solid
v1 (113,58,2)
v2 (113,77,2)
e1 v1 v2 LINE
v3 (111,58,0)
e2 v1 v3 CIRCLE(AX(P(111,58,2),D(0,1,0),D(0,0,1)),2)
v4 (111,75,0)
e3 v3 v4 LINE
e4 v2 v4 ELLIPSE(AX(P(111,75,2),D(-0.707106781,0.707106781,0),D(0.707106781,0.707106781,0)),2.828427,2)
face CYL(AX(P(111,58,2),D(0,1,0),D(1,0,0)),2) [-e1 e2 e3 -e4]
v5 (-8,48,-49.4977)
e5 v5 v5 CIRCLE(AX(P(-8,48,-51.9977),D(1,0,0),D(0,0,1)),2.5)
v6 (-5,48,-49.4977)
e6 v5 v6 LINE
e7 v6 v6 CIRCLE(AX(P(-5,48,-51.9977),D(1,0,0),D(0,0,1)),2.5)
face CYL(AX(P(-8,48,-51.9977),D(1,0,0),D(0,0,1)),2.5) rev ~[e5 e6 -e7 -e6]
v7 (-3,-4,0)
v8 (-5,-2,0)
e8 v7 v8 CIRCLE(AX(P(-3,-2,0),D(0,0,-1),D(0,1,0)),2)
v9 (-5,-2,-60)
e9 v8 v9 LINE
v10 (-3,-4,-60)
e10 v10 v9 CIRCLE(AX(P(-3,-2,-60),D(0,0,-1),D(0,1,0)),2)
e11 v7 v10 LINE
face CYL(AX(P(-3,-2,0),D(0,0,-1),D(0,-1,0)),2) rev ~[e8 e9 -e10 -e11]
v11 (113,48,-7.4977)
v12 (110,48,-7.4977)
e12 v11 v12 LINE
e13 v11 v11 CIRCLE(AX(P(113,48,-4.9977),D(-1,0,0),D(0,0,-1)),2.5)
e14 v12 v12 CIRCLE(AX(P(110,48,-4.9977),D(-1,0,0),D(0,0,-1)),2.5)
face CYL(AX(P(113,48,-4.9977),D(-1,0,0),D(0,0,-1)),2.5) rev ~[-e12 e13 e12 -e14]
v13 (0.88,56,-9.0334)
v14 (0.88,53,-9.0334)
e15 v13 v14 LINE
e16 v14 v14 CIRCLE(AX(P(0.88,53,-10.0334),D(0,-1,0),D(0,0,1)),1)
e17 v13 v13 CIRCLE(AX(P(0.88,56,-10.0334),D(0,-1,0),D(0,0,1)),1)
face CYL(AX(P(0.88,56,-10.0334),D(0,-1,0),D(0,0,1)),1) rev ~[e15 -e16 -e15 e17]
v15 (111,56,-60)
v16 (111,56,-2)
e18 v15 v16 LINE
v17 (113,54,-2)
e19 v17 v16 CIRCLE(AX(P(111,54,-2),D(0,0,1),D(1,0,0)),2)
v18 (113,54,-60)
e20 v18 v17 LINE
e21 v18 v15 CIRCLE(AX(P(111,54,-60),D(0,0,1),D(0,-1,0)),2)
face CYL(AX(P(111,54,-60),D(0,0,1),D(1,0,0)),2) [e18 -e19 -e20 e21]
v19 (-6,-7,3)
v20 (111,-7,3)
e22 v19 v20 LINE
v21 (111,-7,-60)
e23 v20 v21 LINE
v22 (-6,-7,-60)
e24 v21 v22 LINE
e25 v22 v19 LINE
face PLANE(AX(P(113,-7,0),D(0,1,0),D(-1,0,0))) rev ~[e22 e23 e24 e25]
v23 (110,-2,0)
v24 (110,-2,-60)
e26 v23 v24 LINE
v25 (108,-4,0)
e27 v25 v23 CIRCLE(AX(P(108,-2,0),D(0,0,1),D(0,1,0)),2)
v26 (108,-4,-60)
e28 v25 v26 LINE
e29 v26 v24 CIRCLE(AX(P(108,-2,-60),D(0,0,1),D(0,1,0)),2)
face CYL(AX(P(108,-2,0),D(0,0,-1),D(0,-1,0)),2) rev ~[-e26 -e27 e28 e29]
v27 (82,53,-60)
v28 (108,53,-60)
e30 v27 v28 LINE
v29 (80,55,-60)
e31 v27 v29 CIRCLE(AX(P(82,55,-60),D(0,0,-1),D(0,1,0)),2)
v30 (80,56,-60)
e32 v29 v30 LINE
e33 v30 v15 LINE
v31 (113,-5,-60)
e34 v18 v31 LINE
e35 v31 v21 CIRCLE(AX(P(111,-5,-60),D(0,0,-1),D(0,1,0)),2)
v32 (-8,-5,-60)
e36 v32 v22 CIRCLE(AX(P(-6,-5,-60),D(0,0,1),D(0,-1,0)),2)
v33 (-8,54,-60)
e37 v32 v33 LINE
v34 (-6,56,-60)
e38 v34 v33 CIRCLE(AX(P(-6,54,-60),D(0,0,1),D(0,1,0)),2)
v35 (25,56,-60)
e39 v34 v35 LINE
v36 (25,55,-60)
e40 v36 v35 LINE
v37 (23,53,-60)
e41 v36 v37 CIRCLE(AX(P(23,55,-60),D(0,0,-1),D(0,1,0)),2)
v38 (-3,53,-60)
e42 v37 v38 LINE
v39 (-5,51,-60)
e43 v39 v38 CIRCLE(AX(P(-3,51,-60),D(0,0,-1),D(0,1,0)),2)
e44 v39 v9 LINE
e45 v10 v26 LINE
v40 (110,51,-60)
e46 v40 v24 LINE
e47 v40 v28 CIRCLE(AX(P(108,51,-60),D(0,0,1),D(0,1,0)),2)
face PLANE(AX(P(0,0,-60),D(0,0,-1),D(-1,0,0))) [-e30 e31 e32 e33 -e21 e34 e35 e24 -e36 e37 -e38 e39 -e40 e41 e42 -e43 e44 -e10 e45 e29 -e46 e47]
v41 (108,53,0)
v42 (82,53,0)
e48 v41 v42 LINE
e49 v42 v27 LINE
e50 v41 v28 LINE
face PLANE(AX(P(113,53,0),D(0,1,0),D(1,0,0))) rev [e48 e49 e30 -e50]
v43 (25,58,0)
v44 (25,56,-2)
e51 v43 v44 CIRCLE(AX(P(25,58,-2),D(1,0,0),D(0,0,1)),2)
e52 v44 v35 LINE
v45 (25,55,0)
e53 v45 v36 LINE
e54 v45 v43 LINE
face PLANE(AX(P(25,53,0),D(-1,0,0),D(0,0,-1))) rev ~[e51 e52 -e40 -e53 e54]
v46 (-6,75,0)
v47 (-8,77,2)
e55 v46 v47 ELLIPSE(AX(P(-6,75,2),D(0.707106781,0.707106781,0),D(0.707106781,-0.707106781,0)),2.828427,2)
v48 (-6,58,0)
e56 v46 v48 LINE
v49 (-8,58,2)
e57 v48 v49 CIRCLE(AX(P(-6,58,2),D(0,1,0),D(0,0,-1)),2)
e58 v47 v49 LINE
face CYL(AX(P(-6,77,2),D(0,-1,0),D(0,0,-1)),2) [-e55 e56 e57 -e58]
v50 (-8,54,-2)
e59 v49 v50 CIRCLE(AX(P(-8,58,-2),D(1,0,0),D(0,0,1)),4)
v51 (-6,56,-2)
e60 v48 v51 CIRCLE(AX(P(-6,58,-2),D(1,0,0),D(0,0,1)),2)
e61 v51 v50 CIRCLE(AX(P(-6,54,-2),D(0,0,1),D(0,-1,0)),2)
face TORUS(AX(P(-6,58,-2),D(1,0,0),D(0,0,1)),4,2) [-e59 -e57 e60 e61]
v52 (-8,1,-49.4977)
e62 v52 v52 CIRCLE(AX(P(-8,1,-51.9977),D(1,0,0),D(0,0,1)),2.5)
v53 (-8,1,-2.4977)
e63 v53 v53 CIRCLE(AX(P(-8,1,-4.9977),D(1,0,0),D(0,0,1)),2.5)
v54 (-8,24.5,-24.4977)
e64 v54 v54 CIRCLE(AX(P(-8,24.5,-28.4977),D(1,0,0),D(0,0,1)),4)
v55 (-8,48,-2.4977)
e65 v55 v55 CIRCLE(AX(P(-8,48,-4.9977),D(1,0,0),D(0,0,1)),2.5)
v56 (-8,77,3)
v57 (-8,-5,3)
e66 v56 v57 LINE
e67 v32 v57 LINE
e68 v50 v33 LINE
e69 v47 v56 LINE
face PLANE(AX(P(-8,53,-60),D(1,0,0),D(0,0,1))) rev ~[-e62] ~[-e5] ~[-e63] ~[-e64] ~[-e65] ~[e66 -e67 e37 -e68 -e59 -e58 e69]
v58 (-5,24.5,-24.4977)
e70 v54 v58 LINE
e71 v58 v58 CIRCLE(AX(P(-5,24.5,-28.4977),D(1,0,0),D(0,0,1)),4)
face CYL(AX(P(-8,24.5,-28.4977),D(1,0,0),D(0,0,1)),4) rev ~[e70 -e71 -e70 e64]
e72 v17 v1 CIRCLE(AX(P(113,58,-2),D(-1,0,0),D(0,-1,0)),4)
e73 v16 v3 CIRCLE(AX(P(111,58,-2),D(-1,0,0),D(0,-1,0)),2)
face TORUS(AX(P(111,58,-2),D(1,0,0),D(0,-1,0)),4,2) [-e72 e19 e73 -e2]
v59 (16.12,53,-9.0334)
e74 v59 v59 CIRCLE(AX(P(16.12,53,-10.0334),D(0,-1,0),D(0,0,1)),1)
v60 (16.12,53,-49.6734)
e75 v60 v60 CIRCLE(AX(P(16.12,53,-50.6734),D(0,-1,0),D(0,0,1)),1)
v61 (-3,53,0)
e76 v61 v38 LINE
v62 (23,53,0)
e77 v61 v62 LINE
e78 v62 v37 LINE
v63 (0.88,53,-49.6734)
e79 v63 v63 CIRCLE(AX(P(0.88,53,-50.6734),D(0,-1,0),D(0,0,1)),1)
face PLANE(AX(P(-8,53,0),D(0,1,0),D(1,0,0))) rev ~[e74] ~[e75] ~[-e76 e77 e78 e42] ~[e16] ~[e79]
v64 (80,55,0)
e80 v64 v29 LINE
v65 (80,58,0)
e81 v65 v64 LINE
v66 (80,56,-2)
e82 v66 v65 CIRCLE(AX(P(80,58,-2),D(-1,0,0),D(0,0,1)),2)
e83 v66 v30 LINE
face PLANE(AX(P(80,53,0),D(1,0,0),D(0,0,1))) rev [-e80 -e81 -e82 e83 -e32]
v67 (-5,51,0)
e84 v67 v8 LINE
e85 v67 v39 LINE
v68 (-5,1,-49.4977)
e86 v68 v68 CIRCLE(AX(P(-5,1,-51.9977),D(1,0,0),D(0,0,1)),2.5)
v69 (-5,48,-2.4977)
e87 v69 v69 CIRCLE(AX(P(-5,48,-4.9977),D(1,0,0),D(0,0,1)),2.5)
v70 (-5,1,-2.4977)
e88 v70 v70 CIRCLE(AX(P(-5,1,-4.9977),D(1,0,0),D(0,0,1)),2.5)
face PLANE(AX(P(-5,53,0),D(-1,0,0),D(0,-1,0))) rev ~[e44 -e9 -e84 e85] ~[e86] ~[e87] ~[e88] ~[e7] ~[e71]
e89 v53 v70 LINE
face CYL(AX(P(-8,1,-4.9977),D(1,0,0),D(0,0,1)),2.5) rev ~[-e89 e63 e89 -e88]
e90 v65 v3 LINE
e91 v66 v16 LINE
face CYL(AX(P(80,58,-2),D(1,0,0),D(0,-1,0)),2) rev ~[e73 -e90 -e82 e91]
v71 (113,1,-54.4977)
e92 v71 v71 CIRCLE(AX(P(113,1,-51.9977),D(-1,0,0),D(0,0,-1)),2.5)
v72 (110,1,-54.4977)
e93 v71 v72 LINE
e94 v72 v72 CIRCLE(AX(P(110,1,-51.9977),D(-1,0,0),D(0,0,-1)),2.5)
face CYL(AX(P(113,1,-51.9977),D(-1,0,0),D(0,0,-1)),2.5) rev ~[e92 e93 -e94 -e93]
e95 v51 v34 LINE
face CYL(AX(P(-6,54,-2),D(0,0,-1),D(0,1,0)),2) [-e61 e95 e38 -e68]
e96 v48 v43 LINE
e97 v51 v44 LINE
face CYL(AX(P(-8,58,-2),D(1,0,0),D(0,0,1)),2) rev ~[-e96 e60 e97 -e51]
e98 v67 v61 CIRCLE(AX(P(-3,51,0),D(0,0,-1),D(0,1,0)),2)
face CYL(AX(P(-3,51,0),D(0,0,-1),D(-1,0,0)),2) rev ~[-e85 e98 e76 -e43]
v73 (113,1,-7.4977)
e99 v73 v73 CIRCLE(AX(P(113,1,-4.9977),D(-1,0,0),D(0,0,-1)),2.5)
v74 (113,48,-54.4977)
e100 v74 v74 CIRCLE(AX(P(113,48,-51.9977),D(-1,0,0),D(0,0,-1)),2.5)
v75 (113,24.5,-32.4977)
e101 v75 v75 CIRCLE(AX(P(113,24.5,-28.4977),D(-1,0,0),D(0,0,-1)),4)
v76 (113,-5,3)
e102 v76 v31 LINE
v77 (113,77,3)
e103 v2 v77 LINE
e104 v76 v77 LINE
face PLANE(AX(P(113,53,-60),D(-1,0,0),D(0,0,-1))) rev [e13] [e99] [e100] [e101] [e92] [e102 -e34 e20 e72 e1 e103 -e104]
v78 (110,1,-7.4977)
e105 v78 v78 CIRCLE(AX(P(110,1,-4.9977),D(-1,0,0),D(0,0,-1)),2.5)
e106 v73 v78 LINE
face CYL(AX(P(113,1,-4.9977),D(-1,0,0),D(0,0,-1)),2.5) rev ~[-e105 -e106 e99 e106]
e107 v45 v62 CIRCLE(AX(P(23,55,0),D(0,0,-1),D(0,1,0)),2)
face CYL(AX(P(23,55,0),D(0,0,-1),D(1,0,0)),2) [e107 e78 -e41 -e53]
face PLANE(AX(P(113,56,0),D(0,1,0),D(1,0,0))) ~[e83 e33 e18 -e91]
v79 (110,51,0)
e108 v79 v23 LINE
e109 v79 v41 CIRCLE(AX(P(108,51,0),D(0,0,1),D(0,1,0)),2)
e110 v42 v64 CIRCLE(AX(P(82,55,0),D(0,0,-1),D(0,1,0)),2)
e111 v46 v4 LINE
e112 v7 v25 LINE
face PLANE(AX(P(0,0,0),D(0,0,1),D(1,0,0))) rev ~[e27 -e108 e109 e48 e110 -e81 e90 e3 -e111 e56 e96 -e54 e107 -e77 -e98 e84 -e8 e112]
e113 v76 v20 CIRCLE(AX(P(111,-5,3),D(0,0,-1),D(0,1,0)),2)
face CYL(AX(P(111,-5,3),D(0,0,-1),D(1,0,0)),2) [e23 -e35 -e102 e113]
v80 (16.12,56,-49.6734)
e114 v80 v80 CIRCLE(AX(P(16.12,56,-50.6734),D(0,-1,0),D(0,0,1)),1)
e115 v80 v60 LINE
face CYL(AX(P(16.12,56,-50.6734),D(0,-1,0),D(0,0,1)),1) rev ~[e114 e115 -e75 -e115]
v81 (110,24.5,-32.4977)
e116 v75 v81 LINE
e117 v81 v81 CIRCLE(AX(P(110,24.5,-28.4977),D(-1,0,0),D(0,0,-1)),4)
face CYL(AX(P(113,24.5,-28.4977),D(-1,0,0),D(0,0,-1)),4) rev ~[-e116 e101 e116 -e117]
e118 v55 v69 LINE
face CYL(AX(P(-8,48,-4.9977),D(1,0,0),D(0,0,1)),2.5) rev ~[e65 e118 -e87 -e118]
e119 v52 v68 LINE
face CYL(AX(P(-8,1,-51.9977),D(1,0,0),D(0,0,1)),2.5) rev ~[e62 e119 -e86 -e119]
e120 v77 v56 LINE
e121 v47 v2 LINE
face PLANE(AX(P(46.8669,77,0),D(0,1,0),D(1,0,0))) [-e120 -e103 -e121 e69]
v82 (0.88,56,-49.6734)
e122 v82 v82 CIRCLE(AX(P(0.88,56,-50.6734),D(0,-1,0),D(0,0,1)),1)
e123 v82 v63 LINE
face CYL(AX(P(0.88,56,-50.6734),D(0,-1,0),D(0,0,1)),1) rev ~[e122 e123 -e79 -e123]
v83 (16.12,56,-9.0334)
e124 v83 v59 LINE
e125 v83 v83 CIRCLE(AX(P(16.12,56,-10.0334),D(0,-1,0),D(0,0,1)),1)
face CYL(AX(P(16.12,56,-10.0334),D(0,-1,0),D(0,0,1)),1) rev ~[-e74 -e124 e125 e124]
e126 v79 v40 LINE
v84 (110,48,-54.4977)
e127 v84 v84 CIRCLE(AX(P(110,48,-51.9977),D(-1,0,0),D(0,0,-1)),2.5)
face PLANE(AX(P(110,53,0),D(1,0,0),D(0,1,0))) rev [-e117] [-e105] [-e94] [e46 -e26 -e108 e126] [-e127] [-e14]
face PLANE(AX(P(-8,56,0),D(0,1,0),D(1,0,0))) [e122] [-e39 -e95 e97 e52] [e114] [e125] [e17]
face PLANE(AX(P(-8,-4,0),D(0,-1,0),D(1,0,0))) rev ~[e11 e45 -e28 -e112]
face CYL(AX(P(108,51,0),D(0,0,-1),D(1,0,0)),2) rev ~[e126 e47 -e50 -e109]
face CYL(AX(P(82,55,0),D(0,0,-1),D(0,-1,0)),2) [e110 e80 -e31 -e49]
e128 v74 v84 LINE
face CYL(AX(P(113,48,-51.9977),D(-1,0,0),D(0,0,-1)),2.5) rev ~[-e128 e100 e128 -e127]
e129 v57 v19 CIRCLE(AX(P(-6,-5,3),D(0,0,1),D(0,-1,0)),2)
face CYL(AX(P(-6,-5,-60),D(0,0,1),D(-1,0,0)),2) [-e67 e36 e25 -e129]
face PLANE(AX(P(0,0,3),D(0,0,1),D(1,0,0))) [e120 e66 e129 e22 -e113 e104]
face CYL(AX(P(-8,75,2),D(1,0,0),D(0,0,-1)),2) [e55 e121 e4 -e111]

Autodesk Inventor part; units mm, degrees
ref_plane "YZ Plane" through (0, 0, 0) normal (1, 0, 0) x (0, 1, 0)
ref_plane "XZ Plane" through (0, 0, 0) normal (0, 1, 0) x (-1, 0, 0)
ref_plane "XY Plane" through (0, 0, 0) normal (0, 0, 1) x (1, 0, 0)
sketch "Boceto1" plane through (0, 0, 0) normal (0, 0, 1) x (1, 0, 0)
  line L0 (105, 0) -> (105, 24.5) projected
  line L1 (0, 24.5) -> (0, 0) projected
  line L2 (105, 24.5) -> (0, 24.5)
  line L3 (113, 129.5) -> (-8, 129.5)
  line L4 (-8, 129.5) -> (-8, -80.5)
  line L5 (-8, -80.5) -> (113, -80.5)
  line L6 (113, -80.5) -> (113, 129.5)
  line L7 (113, 129.5) -> (-8, -80.5) construction
  line L8 (-8, 129.5) -> (113, -80.5) construction
  point P0 (52.5, 24.5)
  dimension "d0" = 121
  dimension "d1" = 210
extrude "Extrusión1" add sketch "Boceto1" along normal blind 3
sketch "Boceto2" plane through (0, 0, 0) normal (0, 0, -1) x (-1, 0, 0)
  line L0 (0, 53) -> (5, 53) projected
  line L1 (0, -4) -> (5, -4) projected
  line L2 (5, 53) -> (8, 53)
  line L3 (8, 129.5) -> (8, -80.5) projected
  line L4 (5, -4) -> (8, -4)
  line L5 (8, -4) -> (8, 53)
  line L6 (8, 53) -> (5, 53)
  line L7 (5, 53) -> (5, -4)
  point P0 (0, 0)
ref_plane "Plano de trabajo1" through (52.5, -80.5, 0) normal (-1, 0, 0) x (0, 0, 1)
extrude "Extrusión2" add sketch "Boceto2" along normal blind 60
sketch "Boceto3" plane through (-8, -80.5, 3) normal (-1, 0, 0) x (0, 0, 1)
  circle A0 centre (-54.9977, 81.5) radius 3 projected
  circle A1 centre (-54.9977, 128.5) radius 3 projected
  circle A2 centre (-7.9977, 128.5) radius 3 projected
  circle A3 centre (-7.9977, 81.5) radius 3 projected
  point P0 (-3, 80.5)
hole "Agujero1" at (-8, 1, -51.9977) at (-8, 48, -51.9977) at (-8, 48, -4.9977) at (-8, 1, -4.9977) direction (1, 0, 0) diameter 5 end up to surface
sketch "Boceto4" plane through (-8, -80.5, 3) normal (-1, 0, 0) x (0, 0, 1)
  circle A0 centre (-31.4977, 105) radius 4 projected
  circle A1 centre (-31.4977, 105) radius 4
  point P0 (-3, 80.5)
  dimension "d13" = 8
hole "Agujero2" at (-8, 24.5, -28.4977) direction (1, 0, 0) diameter 8 end up to surface
sketch "Boceto5" plane through (-8, 53, 0) normal (0, 1, 0) x (1, 0, 0)
  line L0 (3, 0) -> (33, 0)
  line L1 (33, 0) -> (33, 60)
  line L2 (33, 60) -> (3, 60)
  line L3 (3, 60) -> (0, 60)
  line L4 (0, 60) -> (0, 0)
  line L5 (0, 0) -> (3, 0)
  line L6 (33, 60) -> (33, 0)
  line L7 (33, 60) -> (0, 60)
  line L8 (0, 60) -> (0, 0)
  line L9 (0, 0) -> (33, 0)
  line L10 (33, 0) -> (33, 60)
  point P0 (8, 0)
  dimension "d21" = 30
  dimension "d22" = 60
extrude "Extrusión3" add sketch "Boceto5" along normal blind 3
sketch "Boceto6" plane through (-8, 56, 0) normal (0, 1, 0) x (1, 0, 0)
  circle A0 centre (8.88, 50.6734) radius 0.889 projected
  circle A1 centre (24.12, 50.6734) radius 0.889 projected
  circle A2 centre (24.12, 10.0334) radius 0.889 projected
  circle A3 centre (8.88, 10.0334) radius 0.889 projected
  point P0 (8, 0)
hole "Agujero3" at (16.12, 56, -50.6734) at (0.88, 56, -50.6734) at (16.12, 56, -10.0334) at (0.88, 56, -10.0334) direction (0, -1, 0) diameter 2 end up to surface
mirror "Simetría1" about plane through (52.5, -80.5, 0) normal (-1, 0, 0) of "Extrusión3", "Agujero2", "Agujero1", "Extrusión2"
fillet "Empalme1" radius 2 2 edges at (96.5, 56, 0) (8.5, 56, 0)
sketch "Boceto7" plane through (0, 0, 0) normal (0, 0, -1) x (-1, 0, 0)
  line L0 (8, -4) -> (8, -7)
  line L1 (8, -4) -> (8, -80.5) projected
  line L2 (8, -7) -> (-113, -7)
  line L3 (-113, -80.5) -> (-113, 129.5) projected
  line L4 (-113, -80.5) -> (-113, -7)
  line L5 (-113, -80.5) -> (-113, -4) projected
  line L6 (-113, -80.5) -> (8, -80.5)
  line L7 (8, -80.5) -> (8, -7)
  point P0 (0, 0)
  dimension "d33" = 3
extrude "Extrusión4" cut sketch "Boceto7" against normal blind 3
sketch "Boceto8" plane through (0, 0, 0) normal (0, 0, -1) x (-1, 0, 0)
  line L0 (-113, -4) -> (-113, -7)
  line L1 (-113, -7) -> (8, -7)
  line L2 (8, -7) -> (8, -4)
  line L3 (8, -4) -> (-113, -4)
  point P0 (0, 0)
  dimension "d36" = 3
  dimension "d37" = 121
  dimension "d38" = 3
extrude "Extrusión5" add sketch "Boceto8" along normal blind 60
sketch "Boceto9" plane through (0, 0, -60) normal (0, 0, -1) x (-1, 0, 0)
  point P0 (0, 0)
sketch "Boceto10" plane through (0, 0, 0) normal (0, 0, -1) x (-1, 0, 0)
  line L0 (-46.8669, 72) -> (-100.1331, 72) projected
  line L1 (-46.8669, 77) -> (-100.1331, 77)
  line L2 (-100.1331, 77) -> (-113, 77)
  line L3 (-113, 58) -> (-113, 129.5) projected
  line L4 (-46.8669, 77) -> (6.9064, 77)
  line L5 (6.9064, 77) -> (8, 77)
  line L6 (8, 129.5) -> (8, 58) projected
  line L7 (-113, 77) -> (8.9757, 77)
  line L8 (8.9757, 77) -> (8.9757, 129.5)
  line L9 (8.9757, 129.5) -> (-113, 129.5)
  line L10 (-113, 129.5) -> (-113, 77)
  point P0 (0, 0)
  dimension "d41" = 5
extrude "Extrusión6" cut sketch "Boceto10" against normal blind 10
fillet "Empalme2" radius 2 11 edges at (-5, 53, -30) (-8, 56.5858, -0.5858) (-8, 67.5, 0) (-8, 56, -31) (-5, -4, -30) (110, -4, -30) (110, 53, -30) (113, 56.5858, -0.5858) (113, 67.5, 0) (113, 56, -31) (52.5, 77, 0)
fillet "Empalme3" radius 2 2 edges at (80, 53, -30) (25, 53, -30)
fillet "Empalme4" radius 2 2 edges at (113, -7, -28.5) (-8, -7, -28.5)
properties part number "base"
